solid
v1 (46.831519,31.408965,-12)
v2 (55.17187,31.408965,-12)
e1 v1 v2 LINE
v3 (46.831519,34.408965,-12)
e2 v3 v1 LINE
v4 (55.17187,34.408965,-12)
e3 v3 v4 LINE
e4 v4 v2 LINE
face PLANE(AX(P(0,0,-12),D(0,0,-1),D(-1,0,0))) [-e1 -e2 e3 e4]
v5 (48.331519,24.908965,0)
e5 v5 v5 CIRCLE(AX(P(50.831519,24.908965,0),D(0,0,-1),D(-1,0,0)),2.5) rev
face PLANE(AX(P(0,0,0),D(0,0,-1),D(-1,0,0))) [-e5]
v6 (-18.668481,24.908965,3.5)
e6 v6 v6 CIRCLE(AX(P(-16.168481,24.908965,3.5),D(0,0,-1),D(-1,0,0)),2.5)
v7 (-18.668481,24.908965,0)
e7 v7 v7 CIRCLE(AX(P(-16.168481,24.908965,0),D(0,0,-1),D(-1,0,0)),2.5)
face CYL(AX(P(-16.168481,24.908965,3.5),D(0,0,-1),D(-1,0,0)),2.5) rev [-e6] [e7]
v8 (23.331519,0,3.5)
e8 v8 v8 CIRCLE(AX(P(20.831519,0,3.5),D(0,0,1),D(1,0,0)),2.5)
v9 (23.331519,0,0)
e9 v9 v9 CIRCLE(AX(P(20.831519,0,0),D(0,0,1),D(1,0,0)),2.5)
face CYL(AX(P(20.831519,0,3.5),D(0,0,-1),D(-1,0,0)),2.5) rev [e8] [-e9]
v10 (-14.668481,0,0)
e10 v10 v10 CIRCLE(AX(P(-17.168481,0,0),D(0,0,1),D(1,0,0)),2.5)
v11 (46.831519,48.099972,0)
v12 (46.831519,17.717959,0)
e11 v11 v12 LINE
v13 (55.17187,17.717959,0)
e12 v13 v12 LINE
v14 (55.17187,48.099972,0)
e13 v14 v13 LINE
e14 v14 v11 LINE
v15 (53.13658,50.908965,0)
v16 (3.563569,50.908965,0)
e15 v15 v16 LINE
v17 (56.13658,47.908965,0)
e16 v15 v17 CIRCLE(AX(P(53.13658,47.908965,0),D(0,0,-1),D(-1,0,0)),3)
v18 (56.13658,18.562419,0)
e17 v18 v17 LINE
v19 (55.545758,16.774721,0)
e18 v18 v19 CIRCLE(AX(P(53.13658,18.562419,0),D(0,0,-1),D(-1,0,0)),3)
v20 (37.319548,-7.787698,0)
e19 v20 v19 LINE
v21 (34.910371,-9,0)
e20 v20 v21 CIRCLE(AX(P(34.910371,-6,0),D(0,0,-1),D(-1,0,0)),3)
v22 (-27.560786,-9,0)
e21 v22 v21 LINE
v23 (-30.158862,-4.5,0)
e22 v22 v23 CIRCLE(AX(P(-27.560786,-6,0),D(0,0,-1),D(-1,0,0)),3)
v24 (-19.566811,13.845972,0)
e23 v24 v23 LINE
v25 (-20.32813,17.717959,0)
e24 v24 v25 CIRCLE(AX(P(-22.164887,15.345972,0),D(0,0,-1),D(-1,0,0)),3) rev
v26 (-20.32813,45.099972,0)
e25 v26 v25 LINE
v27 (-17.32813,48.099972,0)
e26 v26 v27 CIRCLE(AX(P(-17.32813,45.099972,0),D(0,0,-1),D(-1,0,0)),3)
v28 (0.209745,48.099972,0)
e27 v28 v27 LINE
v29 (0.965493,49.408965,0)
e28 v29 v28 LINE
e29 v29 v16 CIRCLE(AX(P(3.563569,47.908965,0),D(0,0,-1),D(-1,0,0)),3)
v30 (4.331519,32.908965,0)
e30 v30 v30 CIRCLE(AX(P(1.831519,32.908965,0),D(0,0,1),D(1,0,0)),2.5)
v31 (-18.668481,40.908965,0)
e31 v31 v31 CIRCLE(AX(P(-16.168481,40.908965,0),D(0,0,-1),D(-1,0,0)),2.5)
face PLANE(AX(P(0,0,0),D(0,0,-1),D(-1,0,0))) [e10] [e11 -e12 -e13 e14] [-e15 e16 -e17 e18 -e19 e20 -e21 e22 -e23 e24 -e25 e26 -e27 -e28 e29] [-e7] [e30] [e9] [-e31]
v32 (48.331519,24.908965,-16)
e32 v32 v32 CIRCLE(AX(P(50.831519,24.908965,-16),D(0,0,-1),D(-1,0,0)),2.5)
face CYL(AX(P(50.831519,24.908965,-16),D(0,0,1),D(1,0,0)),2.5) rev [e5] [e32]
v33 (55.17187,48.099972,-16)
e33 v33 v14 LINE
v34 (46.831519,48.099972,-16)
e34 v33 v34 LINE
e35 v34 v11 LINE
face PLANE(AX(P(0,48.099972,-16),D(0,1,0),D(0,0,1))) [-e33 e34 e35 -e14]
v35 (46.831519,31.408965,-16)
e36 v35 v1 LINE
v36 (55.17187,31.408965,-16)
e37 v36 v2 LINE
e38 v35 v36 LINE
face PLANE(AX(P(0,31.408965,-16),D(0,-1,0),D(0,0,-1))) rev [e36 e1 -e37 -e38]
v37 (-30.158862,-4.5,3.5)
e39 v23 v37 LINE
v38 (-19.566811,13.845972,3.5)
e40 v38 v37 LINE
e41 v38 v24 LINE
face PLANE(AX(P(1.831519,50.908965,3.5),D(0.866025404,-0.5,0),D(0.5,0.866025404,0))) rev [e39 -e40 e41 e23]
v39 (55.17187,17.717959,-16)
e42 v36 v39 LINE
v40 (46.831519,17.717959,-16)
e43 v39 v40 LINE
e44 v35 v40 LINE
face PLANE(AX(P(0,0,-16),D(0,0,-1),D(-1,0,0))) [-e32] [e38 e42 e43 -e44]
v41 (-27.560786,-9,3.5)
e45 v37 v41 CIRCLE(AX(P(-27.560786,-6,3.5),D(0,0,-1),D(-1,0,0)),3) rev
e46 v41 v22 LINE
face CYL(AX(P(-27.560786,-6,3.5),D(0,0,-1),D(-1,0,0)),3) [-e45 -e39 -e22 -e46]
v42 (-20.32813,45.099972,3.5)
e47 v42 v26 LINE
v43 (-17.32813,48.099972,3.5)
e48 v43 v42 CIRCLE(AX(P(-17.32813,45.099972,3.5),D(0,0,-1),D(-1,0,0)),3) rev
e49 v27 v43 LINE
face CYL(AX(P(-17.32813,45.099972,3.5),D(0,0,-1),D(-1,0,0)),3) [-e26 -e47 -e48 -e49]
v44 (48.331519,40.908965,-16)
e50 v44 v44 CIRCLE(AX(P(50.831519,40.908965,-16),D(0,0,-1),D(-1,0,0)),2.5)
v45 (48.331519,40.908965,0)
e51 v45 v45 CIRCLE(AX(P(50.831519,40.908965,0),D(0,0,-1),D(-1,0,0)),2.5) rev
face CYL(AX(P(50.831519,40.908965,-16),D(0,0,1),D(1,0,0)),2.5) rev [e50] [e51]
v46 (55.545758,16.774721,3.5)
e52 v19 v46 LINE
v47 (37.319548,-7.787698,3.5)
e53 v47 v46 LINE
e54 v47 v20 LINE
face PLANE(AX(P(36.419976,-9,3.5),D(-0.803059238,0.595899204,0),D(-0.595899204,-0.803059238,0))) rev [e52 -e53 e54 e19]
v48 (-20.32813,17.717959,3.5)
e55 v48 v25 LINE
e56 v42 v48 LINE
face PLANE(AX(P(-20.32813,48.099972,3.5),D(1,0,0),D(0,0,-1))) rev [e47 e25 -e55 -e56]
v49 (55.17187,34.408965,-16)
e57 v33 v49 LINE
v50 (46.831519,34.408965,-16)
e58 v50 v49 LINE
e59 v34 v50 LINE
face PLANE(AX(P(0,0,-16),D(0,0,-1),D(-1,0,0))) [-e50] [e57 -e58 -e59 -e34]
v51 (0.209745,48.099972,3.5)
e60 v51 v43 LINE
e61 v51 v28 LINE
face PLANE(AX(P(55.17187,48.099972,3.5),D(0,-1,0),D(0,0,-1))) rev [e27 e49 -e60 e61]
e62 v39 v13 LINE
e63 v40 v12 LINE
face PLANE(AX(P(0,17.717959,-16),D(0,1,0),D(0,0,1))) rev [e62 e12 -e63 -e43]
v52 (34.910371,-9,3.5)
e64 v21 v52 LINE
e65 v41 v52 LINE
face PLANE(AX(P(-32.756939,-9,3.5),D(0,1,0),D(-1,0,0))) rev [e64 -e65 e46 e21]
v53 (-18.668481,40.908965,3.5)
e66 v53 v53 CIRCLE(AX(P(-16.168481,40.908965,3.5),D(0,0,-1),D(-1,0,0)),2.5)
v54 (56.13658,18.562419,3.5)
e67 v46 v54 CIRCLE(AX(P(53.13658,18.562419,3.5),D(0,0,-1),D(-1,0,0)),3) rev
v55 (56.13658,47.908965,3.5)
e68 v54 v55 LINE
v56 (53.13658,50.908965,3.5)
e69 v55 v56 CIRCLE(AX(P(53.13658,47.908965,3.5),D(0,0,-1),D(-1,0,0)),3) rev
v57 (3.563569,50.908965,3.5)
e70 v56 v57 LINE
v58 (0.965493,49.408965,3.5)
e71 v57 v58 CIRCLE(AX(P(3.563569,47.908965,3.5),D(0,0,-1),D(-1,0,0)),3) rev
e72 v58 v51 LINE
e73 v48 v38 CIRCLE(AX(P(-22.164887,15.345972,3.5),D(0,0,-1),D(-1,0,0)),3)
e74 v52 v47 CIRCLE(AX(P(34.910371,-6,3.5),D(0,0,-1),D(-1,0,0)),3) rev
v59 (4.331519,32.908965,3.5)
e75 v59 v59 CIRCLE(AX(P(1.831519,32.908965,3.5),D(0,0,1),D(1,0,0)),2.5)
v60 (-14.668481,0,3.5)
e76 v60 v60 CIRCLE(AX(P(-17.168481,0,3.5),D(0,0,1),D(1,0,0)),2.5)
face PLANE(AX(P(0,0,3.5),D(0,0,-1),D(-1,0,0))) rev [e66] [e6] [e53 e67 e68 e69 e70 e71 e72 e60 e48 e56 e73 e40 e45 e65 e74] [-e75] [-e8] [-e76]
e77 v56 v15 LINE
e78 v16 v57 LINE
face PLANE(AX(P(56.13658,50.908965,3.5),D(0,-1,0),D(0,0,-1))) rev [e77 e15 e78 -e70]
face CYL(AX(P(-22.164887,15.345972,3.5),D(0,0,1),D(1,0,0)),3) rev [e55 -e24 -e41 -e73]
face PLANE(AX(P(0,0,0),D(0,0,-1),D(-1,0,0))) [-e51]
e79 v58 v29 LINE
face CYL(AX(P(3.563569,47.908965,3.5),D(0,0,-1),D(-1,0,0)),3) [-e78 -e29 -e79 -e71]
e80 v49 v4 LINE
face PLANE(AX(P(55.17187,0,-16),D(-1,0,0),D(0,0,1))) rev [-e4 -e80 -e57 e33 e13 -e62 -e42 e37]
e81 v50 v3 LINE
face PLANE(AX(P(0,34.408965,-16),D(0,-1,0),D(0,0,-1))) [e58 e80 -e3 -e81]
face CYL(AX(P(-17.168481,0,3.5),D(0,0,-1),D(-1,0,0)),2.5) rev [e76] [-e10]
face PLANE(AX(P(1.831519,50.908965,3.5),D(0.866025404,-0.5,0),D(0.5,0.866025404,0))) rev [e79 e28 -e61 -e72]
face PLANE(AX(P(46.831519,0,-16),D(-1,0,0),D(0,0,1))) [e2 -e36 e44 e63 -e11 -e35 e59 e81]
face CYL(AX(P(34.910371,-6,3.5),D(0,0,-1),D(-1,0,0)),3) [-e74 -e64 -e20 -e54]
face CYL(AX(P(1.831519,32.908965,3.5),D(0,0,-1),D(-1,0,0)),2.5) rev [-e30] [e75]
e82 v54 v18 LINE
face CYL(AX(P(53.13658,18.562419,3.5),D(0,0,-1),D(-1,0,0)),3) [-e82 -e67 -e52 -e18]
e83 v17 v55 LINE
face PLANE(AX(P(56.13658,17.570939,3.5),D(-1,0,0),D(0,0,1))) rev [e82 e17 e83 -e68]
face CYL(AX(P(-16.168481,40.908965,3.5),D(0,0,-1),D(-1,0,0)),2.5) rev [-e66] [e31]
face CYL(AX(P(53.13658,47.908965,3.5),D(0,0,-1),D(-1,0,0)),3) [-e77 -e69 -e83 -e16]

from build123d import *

# Parameters (mm, degrees)
SKETCH1_R           = 2.5
BOSS_EXTRUDE1_DEPTH = 3.5
FILLET1_R           = 3
SKETCH2_W           = 75.5
SKETCH2_H           = 30.382012963
SKETCH2_R           = 4.125
SKETCH2_R_2         = 2.5
BOSS_EXTRUDE2_DEPTH = 3.5
SKETCH2_4_W         = 8.340351234
SKETCH2_4_H         = 13.691006481
SKETCH2_4_R         = 2.5
SKETCH2_4_H_2       = 13.691006482
BOSS_EXTRUDE3_DEPTH = 16
FILLET2_R           = 3
FILLET3_R           = 3
SKETCH2_7_W         = 8.340351234
SKETCH2_7_H         = 3
BOSS_EXTRUDE5_DEPTH = 12


with BuildPart() as part:
    # Sketch1 → Boss-Extrude1 (new body)
    with BuildSketch(Plane.XY):
        Polygon((-32.756938656, -9), (36.41997588, -9), (56.136580269, 17.570938838), (56.136580269, 50.908965344), (1.831518612, 50.908965344), align=None)
        with Locations((-17.168481388, 0)):
            Circle(SKETCH1_R, mode=Mode.SUBTRACT)
        with Locations((20.831518612, 0)):
            Circle(SKETCH1_R, mode=Mode.SUBTRACT)
        with Locations((1.831518612, 32.908965344)):
            Circle(SKETCH1_R, mode=Mode.SUBTRACT)
    extrude(amount=BOSS_EXTRUDE1_DEPTH)

    # Fillet1
    fillet1_edges = [part.edges().sort_by_distance(p)[0] for p in [
        (36.41997588, -9, 1.75),
        (-32.756938656, -9, 1.75),
        (1.831518612, 50.908965344, 1.75),
    ]]
    fillet(fillet1_edges, radius=FILLET1_R)

    # Sketch2 → Boss-Extrude2 (add)
    with BuildSketch(Plane(origin=(0, 0, 0), x_dir=(-1, 0, 0), z_dir=(0, 0, -1))):
        with Locations((-17.421869846, 32.908965344)):
            Rectangle(SKETCH2_W, SKETCH2_H)
        with Locations((-1.831518612, 32.908965344)):
            Circle(SKETCH2_R, mode=Mode.SUBTRACT)
        with Locations((16.168481388, 40.908965344)):
            Circle(SKETCH2_R_2, mode=Mode.SUBTRACT)
        with Locations((16.168481388, 24.908965344)):
            Circle(SKETCH2_R_2, mode=Mode.SUBTRACT)
        with Locations((-50.831518612, 24.908965344)):
            Circle(SKETCH2_R_2, mode=Mode.SUBTRACT)
        with Locations((-50.831518612, 40.908965344)):
            Circle(SKETCH2_R_2, mode=Mode.SUBTRACT)
    extrude(amount=-BOSS_EXTRUDE2_DEPTH)

    # Sketch2<4> → Boss-Extrude3 (add)
    # profile 1 of 2: a face of its own
    with BuildSketch(Plane(origin=(0, 0, 0), x_dir=(-1, 0, 0), z_dir=(0, 0, -1))):
        with Locations((-51.001694229, 41.254468585)):
            Rectangle(SKETCH2_4_W, SKETCH2_4_H)
        with Locations((-50.831518612, 40.908965344)):
            Circle(SKETCH2_4_R, mode=Mode.SUBTRACT)
    # profile 2 of 2: a face of its own
    with BuildSketch(Plane(origin=(0, 0, 0), x_dir=(-1, 0, 0), z_dir=(0, 0, -1))):
        with Locations((-51.001694229, 24.563462103)):
            Rectangle(SKETCH2_4_W, SKETCH2_4_H_2)
        with Locations((-50.831518612, 24.908965344)):
            Circle(SKETCH2_4_R, mode=Mode.SUBTRACT)
    extrude(amount=BOSS_EXTRUDE3_DEPTH)

    # Fillet2
    # the kernel refuses this fillet: 3 mm, written as the material it adds along each edge
    with BuildSketch(Plane(origin=(-17.331317914, 17.717958862, 0), x_dir=(-0.4999999999999997, -0.8660254037844388, 0), z_dir=(0, 0, 1))) as fillet2_piece_1:
        with BuildLine():
            CenterArc((4.470985889, -3), FILLET2_R, 90, 82.247461928)
            Line((1.49840612, -2.59531553), (1.438954525, -2.587221841))
            ThreePointArc((1.438954525, -2.587221841), (0.697241536, -1.327657765), (-0.051961524, -0.03))
            Line((-0.051961524, -0.03), (0, 0.06))
            Line((0, 0.06), (4.470985889, 0.06))
            Line((4.470985889, 0.06), (4.470985889, 0))
        make_face()
    extrude(amount=3.5)

    # Fillet3
    fillet3_edges = [part.edges().sort_by_distance(p)[0] for p in [
        (-20.328130154, 48.099971825, 1.75),
        (56.136580269, 50.908965344, 1.75),
        (56.136580269, 17.570938838, 1.75),
    ]]
    fillet(fillet3_edges, radius=FILLET3_R)

    # Sketch2<7> → Boss-Extrude5 (add)
    with BuildSketch(Plane(origin=(0, 0, 0), x_dir=(-1, 0, 0), z_dir=(0, 0, -1))):
        with Locations((-51.001694229, 32.908965344)):
            Rectangle(SKETCH2_7_W, SKETCH2_7_H)
    extrude(amount=BOSS_EXTRUDE5_DEPTH)


solid = part.part
